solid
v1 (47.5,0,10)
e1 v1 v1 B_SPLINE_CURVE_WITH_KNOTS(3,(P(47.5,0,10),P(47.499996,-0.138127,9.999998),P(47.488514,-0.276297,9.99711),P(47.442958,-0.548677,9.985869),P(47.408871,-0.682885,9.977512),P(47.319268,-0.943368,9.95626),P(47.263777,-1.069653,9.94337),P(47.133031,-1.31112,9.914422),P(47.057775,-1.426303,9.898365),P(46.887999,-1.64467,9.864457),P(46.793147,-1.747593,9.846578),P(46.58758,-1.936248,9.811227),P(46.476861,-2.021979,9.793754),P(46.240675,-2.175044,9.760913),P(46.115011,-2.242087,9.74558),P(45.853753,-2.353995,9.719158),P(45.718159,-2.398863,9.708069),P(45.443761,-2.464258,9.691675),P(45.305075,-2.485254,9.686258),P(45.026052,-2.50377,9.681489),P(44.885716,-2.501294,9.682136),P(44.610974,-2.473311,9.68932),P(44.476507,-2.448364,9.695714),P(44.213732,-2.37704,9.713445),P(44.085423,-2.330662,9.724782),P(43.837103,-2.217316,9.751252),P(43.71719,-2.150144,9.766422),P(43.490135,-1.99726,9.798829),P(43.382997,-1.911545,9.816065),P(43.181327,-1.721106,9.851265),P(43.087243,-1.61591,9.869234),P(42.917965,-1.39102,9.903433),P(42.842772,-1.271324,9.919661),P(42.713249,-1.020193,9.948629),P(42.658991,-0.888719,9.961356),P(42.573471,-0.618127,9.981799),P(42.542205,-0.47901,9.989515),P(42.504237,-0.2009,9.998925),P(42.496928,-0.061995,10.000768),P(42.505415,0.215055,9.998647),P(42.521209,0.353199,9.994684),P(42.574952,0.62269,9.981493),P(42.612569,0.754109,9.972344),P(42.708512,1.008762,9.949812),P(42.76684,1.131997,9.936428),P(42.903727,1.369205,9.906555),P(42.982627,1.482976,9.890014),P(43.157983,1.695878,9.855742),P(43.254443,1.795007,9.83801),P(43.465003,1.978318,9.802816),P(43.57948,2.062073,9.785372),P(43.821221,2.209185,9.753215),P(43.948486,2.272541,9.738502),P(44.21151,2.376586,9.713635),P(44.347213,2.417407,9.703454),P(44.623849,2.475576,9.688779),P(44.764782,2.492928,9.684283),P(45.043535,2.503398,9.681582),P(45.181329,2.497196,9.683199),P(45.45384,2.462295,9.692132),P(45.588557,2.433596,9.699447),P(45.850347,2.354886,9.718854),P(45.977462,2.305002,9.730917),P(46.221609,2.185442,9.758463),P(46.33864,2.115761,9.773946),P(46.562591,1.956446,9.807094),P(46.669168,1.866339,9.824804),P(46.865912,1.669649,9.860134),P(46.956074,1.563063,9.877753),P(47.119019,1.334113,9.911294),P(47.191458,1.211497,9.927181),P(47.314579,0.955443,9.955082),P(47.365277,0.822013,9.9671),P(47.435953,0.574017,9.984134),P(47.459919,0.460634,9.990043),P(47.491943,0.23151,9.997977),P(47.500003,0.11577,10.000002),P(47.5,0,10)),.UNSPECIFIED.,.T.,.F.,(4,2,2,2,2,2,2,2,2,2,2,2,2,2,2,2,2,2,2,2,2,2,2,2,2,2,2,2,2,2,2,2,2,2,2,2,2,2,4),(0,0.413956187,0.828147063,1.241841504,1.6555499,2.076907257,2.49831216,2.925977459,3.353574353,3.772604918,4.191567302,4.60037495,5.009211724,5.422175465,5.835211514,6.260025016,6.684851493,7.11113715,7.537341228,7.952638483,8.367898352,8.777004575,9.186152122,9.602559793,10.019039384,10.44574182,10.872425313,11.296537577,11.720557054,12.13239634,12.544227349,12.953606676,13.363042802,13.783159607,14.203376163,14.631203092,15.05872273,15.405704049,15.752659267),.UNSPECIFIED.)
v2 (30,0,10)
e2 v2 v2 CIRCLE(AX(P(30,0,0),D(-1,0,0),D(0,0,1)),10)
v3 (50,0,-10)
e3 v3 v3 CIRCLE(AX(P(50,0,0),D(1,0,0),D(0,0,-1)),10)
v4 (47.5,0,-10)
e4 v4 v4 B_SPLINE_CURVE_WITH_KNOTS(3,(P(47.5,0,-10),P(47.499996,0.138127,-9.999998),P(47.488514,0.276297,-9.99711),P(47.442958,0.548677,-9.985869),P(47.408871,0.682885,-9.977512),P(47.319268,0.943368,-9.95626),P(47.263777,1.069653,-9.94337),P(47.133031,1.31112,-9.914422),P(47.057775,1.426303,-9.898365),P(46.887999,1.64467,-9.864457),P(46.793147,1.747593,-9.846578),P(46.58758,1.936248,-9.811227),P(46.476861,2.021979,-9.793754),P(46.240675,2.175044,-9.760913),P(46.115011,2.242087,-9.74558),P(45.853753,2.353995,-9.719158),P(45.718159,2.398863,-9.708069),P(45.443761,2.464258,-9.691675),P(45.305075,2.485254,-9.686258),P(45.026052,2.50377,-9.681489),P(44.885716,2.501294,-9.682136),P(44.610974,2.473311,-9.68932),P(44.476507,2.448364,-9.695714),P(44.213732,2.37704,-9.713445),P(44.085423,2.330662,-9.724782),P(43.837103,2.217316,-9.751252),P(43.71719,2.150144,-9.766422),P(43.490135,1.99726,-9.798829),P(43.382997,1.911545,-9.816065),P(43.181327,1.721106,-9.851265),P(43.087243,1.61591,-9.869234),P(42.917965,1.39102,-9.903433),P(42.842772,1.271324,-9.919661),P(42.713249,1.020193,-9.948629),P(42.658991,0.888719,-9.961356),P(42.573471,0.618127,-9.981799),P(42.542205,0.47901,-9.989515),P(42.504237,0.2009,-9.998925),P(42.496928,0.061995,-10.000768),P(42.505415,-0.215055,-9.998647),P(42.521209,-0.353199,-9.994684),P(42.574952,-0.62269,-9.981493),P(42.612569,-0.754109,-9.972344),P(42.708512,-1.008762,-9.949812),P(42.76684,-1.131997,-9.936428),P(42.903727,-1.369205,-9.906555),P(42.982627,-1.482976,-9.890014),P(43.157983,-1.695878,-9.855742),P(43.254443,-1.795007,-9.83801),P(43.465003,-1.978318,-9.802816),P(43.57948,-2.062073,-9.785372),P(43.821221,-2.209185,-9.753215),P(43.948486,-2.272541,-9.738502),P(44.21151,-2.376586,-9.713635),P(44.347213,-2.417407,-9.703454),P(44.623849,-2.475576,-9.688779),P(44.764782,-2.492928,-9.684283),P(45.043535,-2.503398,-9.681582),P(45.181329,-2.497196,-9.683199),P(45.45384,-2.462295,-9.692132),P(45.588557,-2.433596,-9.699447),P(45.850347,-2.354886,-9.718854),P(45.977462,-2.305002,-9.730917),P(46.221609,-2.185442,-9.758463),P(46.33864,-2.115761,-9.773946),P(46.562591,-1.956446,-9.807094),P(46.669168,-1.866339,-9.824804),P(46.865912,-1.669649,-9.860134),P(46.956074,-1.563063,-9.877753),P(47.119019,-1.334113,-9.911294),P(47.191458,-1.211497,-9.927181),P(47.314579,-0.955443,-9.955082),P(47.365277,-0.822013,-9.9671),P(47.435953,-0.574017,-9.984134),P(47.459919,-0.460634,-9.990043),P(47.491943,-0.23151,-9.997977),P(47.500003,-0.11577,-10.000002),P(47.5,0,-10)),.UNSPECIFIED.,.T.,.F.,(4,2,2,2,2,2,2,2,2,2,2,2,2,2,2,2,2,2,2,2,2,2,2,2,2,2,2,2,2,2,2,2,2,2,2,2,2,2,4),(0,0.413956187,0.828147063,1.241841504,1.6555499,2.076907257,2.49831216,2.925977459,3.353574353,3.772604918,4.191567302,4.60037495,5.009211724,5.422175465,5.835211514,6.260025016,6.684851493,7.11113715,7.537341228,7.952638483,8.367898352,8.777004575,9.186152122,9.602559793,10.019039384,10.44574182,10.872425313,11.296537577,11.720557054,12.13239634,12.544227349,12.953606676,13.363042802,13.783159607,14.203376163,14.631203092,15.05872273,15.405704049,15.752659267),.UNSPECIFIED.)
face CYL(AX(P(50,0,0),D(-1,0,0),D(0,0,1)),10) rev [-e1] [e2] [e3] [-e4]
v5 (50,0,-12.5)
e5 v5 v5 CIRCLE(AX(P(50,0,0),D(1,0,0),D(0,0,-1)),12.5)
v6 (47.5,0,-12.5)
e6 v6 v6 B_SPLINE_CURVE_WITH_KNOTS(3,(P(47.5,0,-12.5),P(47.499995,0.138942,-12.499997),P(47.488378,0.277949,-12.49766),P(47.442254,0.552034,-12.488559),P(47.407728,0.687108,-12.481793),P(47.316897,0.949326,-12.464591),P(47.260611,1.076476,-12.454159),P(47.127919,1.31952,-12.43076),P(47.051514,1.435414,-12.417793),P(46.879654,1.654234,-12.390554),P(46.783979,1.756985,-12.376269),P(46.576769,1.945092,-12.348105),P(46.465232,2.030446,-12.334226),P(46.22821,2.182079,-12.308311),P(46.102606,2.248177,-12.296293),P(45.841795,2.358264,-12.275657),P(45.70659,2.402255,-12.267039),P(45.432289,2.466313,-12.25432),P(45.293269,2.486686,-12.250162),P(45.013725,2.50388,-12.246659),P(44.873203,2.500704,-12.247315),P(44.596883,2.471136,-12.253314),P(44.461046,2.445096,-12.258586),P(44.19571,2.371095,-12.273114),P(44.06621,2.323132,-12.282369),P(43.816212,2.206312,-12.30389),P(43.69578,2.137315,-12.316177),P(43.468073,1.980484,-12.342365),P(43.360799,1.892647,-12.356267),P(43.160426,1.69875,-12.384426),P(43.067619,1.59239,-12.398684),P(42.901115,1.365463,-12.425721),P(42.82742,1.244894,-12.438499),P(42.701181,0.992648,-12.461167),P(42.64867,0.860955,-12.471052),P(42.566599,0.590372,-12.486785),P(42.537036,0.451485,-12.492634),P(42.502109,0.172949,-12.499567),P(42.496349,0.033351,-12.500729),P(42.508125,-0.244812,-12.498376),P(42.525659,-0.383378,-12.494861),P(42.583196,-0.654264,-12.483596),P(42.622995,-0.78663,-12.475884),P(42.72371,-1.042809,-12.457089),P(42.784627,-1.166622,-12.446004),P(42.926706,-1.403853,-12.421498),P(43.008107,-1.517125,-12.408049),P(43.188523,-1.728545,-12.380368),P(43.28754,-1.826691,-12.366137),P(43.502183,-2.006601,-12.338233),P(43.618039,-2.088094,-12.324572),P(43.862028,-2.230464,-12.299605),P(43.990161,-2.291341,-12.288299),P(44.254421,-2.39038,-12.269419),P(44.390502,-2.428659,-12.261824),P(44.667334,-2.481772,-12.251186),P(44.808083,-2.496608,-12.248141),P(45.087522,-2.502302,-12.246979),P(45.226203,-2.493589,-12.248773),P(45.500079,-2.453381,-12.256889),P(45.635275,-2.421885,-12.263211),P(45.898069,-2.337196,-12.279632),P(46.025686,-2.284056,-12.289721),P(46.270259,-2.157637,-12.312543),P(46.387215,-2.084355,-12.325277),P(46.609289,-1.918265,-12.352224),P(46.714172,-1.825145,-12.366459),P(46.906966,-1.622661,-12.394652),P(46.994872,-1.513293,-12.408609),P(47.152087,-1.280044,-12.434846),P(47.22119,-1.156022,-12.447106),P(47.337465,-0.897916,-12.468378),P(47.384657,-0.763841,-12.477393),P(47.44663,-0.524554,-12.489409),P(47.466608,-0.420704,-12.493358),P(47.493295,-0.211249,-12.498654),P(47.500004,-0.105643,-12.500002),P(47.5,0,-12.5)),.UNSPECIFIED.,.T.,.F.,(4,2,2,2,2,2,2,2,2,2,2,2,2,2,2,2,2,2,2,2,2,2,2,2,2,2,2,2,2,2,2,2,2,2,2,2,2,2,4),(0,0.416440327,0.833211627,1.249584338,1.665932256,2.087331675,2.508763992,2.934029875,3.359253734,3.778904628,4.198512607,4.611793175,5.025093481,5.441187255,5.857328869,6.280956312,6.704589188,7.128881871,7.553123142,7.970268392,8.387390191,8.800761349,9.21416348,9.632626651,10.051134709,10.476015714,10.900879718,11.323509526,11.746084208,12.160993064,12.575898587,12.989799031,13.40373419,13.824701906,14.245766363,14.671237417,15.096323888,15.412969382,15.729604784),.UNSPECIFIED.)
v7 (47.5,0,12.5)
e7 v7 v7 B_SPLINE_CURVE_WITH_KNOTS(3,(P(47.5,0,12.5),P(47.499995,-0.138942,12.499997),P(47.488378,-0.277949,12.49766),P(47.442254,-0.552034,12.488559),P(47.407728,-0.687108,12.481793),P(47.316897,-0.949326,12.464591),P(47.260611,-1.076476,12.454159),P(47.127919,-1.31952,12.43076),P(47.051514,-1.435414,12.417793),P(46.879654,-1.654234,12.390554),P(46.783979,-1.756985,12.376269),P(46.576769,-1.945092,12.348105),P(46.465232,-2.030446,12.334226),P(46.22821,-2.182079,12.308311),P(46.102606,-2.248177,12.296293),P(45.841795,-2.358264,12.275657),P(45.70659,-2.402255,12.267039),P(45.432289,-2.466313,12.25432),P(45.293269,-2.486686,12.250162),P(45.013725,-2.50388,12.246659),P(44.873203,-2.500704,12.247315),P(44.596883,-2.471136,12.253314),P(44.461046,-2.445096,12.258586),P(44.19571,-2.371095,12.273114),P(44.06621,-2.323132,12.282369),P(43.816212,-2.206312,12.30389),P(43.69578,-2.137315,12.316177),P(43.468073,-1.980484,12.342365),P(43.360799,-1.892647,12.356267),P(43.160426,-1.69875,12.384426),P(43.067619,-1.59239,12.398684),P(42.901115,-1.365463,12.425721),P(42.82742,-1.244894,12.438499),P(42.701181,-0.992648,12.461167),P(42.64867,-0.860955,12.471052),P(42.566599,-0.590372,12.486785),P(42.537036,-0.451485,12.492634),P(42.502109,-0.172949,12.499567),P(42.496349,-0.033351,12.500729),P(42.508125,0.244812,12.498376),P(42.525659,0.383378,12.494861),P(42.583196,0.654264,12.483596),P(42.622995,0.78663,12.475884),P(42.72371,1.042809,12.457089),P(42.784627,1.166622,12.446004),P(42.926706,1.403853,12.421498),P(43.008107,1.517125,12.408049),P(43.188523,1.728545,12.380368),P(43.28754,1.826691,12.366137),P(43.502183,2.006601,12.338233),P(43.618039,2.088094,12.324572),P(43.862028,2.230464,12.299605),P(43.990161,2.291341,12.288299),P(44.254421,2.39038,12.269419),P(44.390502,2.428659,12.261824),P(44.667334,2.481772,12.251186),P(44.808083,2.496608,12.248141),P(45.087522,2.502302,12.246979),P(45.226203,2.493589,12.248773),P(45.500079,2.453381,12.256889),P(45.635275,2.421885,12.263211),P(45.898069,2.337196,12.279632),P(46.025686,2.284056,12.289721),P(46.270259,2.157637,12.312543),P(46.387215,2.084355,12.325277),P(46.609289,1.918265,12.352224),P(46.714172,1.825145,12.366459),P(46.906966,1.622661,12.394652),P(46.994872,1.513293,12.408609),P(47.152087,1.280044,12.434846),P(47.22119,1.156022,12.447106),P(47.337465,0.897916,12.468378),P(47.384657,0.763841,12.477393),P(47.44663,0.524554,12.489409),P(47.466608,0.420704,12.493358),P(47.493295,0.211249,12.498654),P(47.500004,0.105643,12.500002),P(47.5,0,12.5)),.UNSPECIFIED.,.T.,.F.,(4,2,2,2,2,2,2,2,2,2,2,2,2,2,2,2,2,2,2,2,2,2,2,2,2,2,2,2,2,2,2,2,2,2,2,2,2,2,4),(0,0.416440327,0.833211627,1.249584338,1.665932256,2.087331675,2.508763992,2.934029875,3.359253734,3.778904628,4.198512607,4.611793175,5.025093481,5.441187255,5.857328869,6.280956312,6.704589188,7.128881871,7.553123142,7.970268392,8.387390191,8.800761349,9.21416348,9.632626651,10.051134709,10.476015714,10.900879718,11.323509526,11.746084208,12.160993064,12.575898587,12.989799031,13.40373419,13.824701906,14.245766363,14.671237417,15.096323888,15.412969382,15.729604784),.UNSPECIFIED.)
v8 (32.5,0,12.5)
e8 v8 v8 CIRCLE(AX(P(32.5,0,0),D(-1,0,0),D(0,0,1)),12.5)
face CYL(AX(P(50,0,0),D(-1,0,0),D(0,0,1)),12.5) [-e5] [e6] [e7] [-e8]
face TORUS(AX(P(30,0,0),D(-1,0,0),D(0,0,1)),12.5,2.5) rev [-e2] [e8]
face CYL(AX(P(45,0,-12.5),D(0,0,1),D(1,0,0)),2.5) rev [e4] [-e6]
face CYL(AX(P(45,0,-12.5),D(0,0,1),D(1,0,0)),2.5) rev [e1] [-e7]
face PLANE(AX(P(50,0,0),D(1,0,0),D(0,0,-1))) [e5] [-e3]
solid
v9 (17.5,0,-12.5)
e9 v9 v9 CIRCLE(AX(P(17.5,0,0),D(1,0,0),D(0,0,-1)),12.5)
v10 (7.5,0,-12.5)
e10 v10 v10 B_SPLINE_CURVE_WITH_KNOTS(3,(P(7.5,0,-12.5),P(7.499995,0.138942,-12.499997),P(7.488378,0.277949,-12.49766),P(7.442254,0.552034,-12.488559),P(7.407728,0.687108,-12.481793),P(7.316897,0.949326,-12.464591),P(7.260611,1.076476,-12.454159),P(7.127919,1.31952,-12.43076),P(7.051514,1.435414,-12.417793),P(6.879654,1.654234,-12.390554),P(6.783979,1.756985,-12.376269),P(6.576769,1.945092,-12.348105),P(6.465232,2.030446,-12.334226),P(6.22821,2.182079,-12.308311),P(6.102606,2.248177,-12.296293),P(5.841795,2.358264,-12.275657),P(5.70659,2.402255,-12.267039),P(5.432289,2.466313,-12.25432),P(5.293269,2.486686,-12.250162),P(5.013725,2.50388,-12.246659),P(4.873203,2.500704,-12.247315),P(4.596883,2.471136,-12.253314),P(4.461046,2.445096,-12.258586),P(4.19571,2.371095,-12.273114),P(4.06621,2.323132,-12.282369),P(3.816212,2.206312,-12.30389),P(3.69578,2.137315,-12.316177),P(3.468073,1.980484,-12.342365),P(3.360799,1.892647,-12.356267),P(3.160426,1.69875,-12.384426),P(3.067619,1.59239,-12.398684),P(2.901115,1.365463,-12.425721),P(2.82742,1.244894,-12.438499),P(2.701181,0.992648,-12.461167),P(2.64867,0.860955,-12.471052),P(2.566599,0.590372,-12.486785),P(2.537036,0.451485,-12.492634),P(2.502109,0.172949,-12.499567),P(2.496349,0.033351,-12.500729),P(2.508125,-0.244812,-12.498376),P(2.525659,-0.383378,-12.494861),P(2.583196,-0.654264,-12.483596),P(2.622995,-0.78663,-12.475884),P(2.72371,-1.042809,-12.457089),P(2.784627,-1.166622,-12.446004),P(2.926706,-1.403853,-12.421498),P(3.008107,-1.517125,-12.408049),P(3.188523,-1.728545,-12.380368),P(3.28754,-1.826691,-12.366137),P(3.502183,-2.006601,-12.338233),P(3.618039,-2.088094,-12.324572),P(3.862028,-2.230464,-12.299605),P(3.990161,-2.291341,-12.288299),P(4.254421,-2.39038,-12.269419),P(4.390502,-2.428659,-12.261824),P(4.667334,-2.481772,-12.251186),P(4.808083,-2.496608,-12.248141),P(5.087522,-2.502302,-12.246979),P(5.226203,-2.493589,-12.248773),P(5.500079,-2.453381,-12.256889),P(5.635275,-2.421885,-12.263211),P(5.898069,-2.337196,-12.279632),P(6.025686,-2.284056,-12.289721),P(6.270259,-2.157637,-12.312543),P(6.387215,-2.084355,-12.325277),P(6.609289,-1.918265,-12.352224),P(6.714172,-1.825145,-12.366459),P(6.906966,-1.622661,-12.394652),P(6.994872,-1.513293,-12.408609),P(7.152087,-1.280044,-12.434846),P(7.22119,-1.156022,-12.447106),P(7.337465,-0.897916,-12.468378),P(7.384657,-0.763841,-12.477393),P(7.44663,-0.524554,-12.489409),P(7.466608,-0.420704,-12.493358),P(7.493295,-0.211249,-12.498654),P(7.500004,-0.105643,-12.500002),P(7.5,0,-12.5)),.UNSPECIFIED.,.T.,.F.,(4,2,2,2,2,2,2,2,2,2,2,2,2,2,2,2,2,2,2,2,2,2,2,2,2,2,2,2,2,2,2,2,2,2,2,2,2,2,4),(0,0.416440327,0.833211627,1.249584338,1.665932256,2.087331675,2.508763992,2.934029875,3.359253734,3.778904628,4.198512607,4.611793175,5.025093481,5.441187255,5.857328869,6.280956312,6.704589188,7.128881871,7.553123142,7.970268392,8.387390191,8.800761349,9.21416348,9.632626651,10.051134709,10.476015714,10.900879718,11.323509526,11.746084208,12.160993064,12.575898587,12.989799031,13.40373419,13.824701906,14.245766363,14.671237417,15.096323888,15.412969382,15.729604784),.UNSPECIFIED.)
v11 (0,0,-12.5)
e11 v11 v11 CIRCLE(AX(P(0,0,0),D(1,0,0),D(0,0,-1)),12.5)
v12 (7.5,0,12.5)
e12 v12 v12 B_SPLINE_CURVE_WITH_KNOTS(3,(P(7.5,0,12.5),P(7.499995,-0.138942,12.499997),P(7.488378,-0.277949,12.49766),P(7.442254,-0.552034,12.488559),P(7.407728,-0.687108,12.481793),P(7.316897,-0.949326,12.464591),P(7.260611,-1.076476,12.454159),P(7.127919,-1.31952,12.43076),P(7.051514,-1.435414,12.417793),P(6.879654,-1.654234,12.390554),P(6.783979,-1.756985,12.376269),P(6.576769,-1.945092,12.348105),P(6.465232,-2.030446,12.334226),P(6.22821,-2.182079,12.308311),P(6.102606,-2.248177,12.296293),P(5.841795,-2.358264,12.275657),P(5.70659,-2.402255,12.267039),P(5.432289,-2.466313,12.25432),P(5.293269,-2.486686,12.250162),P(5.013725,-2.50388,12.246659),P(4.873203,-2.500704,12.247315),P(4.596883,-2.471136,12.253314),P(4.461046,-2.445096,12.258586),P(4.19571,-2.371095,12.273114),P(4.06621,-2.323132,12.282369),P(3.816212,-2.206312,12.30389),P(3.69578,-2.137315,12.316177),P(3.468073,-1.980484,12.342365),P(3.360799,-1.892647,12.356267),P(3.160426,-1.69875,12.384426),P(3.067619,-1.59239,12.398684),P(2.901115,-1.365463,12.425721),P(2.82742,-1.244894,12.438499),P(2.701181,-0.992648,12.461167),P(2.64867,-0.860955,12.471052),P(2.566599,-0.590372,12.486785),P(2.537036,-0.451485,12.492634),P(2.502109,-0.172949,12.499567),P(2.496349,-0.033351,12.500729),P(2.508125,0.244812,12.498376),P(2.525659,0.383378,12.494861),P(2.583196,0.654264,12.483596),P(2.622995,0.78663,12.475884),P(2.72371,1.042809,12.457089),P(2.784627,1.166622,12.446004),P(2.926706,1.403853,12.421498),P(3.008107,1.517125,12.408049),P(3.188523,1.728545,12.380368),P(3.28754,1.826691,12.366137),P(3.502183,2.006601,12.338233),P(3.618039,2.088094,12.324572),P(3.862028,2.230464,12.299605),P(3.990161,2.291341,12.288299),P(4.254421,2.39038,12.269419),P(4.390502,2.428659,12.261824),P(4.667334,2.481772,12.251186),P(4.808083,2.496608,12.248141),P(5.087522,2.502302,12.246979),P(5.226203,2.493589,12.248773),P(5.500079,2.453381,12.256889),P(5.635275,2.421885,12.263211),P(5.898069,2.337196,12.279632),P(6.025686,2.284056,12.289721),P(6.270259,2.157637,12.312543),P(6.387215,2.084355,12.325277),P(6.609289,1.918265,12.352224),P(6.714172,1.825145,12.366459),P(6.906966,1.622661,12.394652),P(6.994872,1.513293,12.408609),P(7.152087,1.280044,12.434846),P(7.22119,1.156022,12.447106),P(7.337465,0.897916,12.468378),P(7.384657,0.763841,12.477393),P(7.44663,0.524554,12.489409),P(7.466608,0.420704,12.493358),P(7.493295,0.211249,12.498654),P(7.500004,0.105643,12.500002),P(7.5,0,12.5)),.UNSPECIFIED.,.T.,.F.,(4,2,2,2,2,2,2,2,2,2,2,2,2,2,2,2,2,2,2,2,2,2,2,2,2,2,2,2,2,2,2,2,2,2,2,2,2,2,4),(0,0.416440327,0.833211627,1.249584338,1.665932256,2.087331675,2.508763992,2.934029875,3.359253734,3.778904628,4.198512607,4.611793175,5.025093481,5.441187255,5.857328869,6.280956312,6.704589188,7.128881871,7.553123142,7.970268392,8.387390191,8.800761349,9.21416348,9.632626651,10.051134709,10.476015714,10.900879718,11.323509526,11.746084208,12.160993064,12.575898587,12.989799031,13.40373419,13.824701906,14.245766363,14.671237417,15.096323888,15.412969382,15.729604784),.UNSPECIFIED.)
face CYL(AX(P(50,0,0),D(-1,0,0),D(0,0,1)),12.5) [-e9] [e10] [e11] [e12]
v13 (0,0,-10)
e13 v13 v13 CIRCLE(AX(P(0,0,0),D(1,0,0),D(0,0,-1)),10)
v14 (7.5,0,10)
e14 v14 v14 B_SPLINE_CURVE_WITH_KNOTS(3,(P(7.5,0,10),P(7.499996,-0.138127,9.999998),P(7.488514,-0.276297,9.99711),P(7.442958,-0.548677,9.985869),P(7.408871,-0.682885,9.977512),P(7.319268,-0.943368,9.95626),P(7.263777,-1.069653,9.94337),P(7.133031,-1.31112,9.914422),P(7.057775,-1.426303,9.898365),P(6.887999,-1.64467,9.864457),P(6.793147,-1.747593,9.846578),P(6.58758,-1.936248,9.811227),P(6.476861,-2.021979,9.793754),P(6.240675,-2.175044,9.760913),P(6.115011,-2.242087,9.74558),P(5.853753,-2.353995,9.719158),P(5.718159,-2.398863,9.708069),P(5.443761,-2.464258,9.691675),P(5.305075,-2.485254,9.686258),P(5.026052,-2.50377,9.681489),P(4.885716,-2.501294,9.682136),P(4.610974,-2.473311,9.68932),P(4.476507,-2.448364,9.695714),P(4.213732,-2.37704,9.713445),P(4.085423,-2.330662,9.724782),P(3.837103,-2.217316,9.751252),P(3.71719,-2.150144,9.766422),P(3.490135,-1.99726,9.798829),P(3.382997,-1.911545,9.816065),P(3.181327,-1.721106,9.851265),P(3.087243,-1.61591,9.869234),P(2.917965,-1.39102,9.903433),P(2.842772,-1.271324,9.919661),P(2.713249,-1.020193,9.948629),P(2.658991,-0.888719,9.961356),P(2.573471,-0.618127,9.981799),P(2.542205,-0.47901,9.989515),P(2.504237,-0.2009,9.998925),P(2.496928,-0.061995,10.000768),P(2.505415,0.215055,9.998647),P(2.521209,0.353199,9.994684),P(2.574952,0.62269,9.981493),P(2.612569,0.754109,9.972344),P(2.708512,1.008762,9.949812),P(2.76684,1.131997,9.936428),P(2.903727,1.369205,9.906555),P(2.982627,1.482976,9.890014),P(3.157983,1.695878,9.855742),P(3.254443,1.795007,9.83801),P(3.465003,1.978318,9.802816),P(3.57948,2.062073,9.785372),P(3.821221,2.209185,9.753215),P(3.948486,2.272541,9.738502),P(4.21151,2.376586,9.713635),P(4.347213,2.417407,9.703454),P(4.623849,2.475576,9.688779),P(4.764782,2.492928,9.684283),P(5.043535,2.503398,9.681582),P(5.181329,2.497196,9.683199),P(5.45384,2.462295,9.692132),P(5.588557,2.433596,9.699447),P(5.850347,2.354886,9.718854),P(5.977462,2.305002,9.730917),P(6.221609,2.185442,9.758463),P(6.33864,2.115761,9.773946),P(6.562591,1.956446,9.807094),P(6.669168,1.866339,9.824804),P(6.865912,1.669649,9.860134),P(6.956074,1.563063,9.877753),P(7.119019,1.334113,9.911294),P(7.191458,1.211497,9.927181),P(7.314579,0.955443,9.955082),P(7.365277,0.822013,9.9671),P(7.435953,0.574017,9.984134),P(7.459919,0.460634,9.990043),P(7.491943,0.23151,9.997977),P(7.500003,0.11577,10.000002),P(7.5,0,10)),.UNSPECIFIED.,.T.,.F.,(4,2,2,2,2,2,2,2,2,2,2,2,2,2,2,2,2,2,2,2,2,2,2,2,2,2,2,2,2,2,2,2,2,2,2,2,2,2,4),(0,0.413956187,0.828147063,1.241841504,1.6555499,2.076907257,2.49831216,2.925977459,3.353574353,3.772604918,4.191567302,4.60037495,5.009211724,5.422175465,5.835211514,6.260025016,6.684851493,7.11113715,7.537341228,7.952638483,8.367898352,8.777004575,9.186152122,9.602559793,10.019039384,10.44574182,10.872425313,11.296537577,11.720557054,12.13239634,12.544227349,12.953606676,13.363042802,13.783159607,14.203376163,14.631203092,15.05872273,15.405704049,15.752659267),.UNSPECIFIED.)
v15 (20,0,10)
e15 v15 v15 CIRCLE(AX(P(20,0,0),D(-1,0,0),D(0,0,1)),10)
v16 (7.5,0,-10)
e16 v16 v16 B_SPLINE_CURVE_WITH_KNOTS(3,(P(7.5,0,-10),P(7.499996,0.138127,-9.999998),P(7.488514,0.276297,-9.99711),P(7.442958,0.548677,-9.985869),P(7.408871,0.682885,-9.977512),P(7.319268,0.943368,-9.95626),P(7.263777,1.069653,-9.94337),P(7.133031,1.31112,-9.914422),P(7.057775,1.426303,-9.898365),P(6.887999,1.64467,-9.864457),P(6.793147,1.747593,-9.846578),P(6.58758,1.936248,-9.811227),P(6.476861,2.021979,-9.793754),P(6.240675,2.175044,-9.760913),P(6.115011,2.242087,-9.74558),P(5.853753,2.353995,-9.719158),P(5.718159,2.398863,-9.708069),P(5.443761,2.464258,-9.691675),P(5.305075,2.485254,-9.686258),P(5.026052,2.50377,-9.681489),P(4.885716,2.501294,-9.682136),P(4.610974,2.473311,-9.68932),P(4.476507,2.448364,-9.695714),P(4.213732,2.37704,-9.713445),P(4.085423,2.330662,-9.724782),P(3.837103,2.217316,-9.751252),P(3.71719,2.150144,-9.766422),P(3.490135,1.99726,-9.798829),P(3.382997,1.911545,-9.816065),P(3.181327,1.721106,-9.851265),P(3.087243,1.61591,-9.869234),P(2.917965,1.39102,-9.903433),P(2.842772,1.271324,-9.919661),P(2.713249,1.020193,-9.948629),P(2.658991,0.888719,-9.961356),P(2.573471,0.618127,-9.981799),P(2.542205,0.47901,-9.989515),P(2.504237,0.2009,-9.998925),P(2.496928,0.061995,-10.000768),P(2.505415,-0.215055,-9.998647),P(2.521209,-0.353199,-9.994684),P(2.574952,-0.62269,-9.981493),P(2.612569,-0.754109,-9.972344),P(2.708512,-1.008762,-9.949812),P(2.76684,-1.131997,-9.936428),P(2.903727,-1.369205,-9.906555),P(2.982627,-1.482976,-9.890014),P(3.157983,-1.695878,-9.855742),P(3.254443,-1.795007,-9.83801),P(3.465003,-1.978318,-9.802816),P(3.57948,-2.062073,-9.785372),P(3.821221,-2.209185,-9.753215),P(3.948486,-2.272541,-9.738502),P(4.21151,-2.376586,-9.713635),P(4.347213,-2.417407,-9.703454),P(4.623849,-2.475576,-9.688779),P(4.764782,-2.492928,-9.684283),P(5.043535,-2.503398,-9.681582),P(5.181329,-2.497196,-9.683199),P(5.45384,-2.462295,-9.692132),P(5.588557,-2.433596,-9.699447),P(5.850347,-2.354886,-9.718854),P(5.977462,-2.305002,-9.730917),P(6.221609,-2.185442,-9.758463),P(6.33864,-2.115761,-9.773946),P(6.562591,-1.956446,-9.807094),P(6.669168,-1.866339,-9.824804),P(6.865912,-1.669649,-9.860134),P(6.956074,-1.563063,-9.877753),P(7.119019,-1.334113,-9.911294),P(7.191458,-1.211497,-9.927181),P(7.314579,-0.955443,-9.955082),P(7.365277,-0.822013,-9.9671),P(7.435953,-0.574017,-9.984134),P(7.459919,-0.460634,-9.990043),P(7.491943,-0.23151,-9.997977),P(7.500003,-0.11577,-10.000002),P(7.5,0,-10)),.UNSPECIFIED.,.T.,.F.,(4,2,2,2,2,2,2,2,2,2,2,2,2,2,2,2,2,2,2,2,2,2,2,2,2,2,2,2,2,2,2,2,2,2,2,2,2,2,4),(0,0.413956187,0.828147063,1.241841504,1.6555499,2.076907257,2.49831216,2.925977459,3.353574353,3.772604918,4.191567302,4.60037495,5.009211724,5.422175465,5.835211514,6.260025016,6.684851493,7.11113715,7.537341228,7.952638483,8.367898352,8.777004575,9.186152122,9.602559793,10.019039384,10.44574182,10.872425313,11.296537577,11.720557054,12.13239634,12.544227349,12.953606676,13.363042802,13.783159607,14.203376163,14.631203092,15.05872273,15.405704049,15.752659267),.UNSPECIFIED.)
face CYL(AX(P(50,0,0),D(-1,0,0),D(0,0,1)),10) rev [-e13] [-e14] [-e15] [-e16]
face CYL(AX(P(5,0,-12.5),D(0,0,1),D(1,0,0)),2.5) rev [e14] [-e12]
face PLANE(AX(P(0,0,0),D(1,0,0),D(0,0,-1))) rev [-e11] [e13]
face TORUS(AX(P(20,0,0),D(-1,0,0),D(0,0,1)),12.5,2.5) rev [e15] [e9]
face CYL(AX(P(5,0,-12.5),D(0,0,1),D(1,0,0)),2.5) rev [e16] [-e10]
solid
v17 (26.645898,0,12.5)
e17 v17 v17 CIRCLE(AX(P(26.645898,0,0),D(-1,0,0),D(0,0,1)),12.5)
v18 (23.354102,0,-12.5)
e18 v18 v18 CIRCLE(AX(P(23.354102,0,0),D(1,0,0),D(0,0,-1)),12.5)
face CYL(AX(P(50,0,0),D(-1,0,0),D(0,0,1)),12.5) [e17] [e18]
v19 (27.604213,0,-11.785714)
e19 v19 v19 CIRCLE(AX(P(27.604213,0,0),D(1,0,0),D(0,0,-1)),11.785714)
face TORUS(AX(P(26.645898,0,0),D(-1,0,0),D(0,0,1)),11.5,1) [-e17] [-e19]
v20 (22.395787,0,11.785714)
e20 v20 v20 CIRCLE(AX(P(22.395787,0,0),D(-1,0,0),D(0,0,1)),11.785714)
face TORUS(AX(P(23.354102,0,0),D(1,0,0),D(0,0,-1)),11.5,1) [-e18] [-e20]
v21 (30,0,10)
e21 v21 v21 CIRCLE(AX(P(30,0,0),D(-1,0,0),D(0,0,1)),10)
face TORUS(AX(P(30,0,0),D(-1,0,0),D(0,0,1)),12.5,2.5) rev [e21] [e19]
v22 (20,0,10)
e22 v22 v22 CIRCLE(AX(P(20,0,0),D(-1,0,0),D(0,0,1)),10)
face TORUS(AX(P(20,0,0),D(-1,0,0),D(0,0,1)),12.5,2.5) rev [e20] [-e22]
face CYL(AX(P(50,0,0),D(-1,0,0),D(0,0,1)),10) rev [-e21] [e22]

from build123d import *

# Parameters (mm, degrees)
SKETCH1_R               = 12.5
SKETCH1_R_2             = 10
BOSS_EXTRUDE1_DEPTH     = 50
SKETCH2_R               = 2.5
CUT_EXTRUDE1_DEPTH      = 54.033008636
CUT_EXTRUDE1_DEPTH_BACK = 54.033008636
SKETCH3_R               = 2.5


with BuildPart() as part:
    # Sketch1 → Boss-Extrude1 (new body)
    with BuildSketch(Plane(origin=(0, 0, 0), x_dir=(0, 0, -1), z_dir=(1, 0, 0))):
        Circle(SKETCH1_R)
        Circle(SKETCH1_R_2, mode=Mode.SUBTRACT)
    extrude(amount=BOSS_EXTRUDE1_DEPTH)

    # Sketch2 → Cut-Revolve1 (revolve, cut)
    with BuildSketch(Plane.XY, mode=Mode.PRIVATE) as cut_revolve1_sk:
        with Locations((20, 12.5)):
            Circle(SKETCH2_R)
        with Locations((30, 12.5)):
            Circle(SKETCH2_R)
    revolve(cut_revolve1_sk.sketch.rotate(Axis((-6.359796463, 0, 0), (1, 0, 0)), 90), axis=Axis((-6.359796463, 0, 0), (1, 0, 0)), mode=Mode.SUBTRACT)


with BuildPart() as cut_revolve1_piece_1:
    # of the separate pieces the step leaves, piece 1, a body of its own (cut_revolve1_pieces)
    add(part.part.solids().sort_by_distance((32.5, 0, -12.5))[0])


with BuildPart() as cut_revolve1_piece_2:
    # of the separate pieces the step leaves, piece 2, a body of its own (cut_revolve1_pieces)
    add(part.part.solids().sort_by_distance((0, 0, -10))[0])


with BuildPart() as cut_revolve1_piece_3:
    # of the separate pieces the step leaves, piece 3, a body of its own (cut_revolve1_pieces)
    add(part.part.solids().sort_by_distance((27.5, 0, -12.5))[0])

    # Fillet1: read off the stored shape, not the designer's step
    # Fillet1 outline → Fillet1 (revolve, cut)
    with BuildSketch(Plane.YX):
        with BuildLine():
            Line((12.5, 27.604212881), (11.785714286, 27.604212881))
            ThreePointArc((11.785714286, 27.604212881), (12.301783726, 27.243512338), (12.5, 26.645898034))
            Line((12.5, 26.645898034), (12.5, 27.604212881))
        make_face()
        with BuildLine():
            Line((12.5, 22.395787119), (12.5, 23.354101966))
            ThreePointArc((12.5, 23.354101966), (12.301783726, 22.756487662), (11.785714286, 22.395787119))
            Line((11.785714286, 22.395787119), (12.5, 22.395787119))
        make_face()
    revolve(axis=Axis((0, 0, 0), (1, 0, 0)), mode=Mode.SUBTRACT)


with BuildPart() as cut_extrude1_tool:
    # Sketch3 → Cut-Extrude1 (new, two sides: drawn at the far end of the back side and taken through both)
    with BuildSketch(Plane.XY.offset(-CUT_EXTRUDE1_DEPTH_BACK)):
        with Locations((5, 0)):
            Circle(SKETCH3_R)
        with Locations((45, 0)):
            Circle(SKETCH3_R)
    extrude(amount=CUT_EXTRUDE1_DEPTH + CUT_EXTRUDE1_DEPTH_BACK)


with BuildPart() as cut_revolve1_piece_1_1:
    add(cut_revolve1_piece_1.part)

    # Cut-Extrude1: cut by cut_extrude1_tool
    add(cut_extrude1_tool.part, mode=Mode.SUBTRACT)


with BuildPart() as cut_revolve1_piece_2_1:
    add(cut_revolve1_piece_2.part)

    # Cut-Extrude1: cut by cut_extrude1_tool
    add(cut_extrude1_tool.part, mode=Mode.SUBTRACT)


solid = Compound([cut_revolve1_piece_3.part, cut_revolve1_piece_1_1.part, cut_revolve1_piece_2_1.part])
